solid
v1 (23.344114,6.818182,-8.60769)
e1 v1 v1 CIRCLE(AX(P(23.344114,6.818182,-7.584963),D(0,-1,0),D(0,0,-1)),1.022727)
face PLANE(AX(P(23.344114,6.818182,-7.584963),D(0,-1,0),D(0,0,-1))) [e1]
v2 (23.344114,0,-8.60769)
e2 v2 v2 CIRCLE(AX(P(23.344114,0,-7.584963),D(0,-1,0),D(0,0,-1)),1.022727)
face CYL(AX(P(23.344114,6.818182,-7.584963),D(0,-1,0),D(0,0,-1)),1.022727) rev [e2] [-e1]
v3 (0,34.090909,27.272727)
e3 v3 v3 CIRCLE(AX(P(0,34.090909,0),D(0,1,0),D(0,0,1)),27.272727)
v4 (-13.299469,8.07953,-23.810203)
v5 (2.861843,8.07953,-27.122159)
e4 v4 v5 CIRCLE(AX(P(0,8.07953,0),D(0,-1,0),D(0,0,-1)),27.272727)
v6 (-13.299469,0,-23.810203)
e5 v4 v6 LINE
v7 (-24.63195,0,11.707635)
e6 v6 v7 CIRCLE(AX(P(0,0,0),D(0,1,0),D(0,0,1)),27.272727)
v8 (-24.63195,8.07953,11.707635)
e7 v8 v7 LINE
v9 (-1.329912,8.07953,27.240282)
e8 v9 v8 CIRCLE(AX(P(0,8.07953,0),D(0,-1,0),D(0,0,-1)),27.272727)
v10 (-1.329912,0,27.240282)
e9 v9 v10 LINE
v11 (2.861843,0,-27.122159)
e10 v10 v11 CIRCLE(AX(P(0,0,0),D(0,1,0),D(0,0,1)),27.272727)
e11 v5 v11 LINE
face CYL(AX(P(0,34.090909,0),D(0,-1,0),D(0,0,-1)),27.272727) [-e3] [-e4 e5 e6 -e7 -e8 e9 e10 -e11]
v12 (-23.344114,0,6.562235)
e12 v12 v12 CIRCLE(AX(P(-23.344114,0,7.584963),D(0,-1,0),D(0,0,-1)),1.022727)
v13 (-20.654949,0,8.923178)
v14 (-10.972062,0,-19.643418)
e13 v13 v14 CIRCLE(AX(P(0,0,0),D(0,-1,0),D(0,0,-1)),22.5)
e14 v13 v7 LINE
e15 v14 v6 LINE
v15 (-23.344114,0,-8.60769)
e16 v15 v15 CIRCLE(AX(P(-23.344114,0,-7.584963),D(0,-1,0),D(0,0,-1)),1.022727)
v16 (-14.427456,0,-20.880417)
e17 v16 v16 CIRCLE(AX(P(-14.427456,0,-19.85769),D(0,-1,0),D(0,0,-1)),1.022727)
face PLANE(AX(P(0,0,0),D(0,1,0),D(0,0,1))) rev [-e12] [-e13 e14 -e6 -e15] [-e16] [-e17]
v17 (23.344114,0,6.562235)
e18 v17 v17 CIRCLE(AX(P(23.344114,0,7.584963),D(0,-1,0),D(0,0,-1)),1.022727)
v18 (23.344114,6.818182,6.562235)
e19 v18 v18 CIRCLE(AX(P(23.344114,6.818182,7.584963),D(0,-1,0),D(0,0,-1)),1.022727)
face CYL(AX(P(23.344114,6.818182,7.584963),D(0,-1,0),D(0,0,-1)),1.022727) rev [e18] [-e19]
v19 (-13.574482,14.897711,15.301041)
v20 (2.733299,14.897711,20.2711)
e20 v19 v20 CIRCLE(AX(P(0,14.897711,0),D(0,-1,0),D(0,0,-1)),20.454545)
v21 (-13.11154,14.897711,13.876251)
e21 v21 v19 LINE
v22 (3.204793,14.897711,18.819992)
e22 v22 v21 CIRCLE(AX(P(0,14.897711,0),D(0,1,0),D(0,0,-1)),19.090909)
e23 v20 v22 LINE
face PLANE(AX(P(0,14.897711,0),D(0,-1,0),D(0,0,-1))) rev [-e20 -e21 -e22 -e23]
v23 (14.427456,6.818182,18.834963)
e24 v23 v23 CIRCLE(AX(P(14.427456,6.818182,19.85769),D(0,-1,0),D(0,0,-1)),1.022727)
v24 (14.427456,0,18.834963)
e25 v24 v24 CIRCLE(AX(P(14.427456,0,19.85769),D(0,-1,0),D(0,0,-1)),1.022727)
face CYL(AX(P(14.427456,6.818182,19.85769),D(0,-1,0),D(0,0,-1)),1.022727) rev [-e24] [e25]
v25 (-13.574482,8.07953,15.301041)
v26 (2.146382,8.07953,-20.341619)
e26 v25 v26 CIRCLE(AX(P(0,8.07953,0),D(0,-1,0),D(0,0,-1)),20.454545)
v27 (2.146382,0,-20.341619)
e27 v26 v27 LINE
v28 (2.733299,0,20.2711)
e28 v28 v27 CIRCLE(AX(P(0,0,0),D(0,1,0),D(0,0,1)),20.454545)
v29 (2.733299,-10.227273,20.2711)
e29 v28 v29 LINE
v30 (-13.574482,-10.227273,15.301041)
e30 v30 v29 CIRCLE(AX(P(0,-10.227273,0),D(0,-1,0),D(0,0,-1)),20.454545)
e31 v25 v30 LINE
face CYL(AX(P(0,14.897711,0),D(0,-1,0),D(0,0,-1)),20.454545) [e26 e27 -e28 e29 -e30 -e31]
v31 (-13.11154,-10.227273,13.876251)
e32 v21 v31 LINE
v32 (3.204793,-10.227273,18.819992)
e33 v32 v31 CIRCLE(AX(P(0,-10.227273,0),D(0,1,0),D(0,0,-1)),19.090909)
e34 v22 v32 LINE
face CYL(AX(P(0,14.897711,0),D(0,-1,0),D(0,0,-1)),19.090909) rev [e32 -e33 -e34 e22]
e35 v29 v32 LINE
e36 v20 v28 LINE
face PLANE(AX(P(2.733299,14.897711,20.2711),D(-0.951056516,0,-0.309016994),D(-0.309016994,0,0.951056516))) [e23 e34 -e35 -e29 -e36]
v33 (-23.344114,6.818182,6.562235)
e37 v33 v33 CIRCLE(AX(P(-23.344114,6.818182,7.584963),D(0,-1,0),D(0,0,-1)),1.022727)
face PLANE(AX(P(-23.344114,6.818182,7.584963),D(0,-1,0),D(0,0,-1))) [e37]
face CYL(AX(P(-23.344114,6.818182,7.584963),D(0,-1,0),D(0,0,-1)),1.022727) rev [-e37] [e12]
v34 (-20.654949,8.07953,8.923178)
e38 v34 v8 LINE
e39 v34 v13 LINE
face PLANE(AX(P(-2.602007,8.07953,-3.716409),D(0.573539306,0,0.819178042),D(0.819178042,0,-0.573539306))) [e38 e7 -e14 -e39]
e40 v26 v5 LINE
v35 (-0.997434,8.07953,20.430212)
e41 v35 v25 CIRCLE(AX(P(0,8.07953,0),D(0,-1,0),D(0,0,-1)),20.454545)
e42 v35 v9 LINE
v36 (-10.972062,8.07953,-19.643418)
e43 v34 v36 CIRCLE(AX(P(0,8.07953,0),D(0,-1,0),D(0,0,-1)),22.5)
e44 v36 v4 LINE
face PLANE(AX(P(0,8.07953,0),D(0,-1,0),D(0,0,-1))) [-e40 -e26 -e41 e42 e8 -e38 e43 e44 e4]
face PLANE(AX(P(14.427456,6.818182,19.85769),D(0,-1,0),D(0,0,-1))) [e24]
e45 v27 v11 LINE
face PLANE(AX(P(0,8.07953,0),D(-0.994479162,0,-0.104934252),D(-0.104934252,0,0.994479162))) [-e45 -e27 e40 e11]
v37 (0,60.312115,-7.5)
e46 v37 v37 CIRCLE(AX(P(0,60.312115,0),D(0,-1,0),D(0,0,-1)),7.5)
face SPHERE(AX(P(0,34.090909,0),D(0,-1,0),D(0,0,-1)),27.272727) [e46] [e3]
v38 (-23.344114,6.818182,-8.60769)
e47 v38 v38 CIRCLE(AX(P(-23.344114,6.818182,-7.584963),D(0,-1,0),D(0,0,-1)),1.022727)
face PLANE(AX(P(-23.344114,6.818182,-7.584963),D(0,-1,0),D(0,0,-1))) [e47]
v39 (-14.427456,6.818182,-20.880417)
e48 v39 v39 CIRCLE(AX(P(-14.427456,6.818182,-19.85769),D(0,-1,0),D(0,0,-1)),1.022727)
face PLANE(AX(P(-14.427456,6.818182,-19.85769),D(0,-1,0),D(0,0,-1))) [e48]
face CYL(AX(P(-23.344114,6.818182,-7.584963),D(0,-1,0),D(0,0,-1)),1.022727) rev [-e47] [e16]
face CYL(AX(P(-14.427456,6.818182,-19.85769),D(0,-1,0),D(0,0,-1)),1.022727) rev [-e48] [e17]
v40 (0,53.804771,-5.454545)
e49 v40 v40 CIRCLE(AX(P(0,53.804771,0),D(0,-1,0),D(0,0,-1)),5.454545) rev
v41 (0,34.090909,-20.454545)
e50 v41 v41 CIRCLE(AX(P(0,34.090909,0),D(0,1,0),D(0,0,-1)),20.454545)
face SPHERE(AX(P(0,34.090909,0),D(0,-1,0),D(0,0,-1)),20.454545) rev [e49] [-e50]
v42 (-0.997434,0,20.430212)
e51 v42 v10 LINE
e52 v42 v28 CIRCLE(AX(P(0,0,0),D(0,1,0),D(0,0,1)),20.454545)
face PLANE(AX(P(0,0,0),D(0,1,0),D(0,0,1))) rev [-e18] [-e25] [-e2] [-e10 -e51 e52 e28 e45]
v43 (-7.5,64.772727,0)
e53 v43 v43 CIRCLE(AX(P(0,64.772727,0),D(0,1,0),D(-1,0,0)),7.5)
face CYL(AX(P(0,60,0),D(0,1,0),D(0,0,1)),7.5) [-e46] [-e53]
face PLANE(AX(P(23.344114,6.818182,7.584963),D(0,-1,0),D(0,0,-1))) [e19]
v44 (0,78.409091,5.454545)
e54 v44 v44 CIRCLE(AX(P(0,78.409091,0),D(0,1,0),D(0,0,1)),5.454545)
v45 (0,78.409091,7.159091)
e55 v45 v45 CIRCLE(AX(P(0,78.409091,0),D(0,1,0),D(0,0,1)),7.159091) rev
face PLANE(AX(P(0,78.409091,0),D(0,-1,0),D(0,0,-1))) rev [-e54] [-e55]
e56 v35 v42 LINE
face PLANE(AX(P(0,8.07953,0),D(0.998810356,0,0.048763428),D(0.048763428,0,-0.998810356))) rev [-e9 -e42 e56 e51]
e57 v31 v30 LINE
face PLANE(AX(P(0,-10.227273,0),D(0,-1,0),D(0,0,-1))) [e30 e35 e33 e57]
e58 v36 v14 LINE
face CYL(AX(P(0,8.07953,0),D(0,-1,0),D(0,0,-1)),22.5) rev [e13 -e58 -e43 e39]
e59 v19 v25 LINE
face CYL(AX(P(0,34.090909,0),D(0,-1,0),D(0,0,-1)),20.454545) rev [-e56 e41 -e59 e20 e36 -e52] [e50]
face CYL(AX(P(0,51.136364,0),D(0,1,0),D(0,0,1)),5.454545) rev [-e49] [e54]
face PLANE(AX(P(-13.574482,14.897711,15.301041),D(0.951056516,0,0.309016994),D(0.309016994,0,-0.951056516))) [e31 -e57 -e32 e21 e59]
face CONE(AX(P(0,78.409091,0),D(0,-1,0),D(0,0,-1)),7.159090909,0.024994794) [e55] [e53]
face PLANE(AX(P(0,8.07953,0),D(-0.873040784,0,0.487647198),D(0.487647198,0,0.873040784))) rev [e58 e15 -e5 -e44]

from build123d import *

# Parameters (mm, degrees)
ESBO_O1_R                     = 40
ESBO_O1_R_2                   = 30
RESSALTO_EXTRUS_O1_DEPTH      = 50
ESBO_O2_R                     = 1.5
CORTE_EXTRUS_O1_DEPTH         = 10
CORTE_EXTRUS_O2_DEPTH         = 11.84997677
RESSALTO_EXTRUS_O2_DEPTH      = 26.84997677
RESSALTO_EXTRUS_O2_DEPTH_BACK = 10
REVOLU_O1_ANGLE               = 180
RESSALTO_EXTRUS_O5_DEPTH      = 5
RESSALTO_EXTRUS_O5_DEPTH_BACK = 2
ESBO_O10_R                    = 11
ESBO_O13_R                    = 8
CORTE_EXTRUS_O4_DEPTH         = 40
ESCALA1_SCALE                 = 0.681818182


# Read off the part's stored shape, not the designer's step: Limites1
with BuildPart() as part:
    # Esboço1 → Ressalto-extrusão1 (new body)
    with BuildSketch(Plane(origin=(0, 0, 0), x_dir=(1, 0, 0), z_dir=(0, 1, 0))):
        with Locations(Location((0, 0, 0), (0, 0, 270))):
            Circle(ESBO_O1_R)
        with Locations(Location((0, 0, 0), (0, 0, 270))):
            Circle(ESBO_O1_R_2, mode=Mode.SUBTRACT)
    extrude(amount=RESSALTO_EXTRUS_O1_DEPTH)

    # Esboço2 → Corte-extrusão1 (cut)
    with BuildSketch(Plane(origin=(0, 0, 0), x_dir=(-1, 0, 0), z_dir=(0, -1, 0))):
        with Locations(Location((-21.160269083, -29.124611797, 0), (0, 0, 90))):
            Circle(ESBO_O2_R)
        with Locations(Location((-34.238034587, -11.124611797, 0), (0, 0, 90))):
            Circle(ESBO_O2_R)
        with Locations(Location((-34.238034587, 11.124611797, 0), (0, 0, 90))):
            Circle(ESBO_O2_R)
        with Locations(Location((21.160269083, 29.124611797, 0), (0, 0, 90))):
            Circle(ESBO_O2_R)
        with Locations(Location((34.238034587, 11.124611797, 0), (0, 0, 90))):
            Circle(ESBO_O2_R)
        with Locations(Location((34.238034587, -11.124611797, 0), (0, 0, 90))):
            Circle(ESBO_O2_R)
    extrude(amount=-CORTE_EXTRUS_O1_DEPTH, mode=Mode.SUBTRACT)

    # Esboço3 → Corte-extrusão2 (cut)
    with BuildSketch(Plane(origin=(0, 0, 0), x_dir=(-1, 0, 0), z_dir=(0, -1, 0))):
        with BuildLine():
            ThreePointArc((30.293924668, -13.087327008), (31.253408489, 10.593604572), (16.092357529, 28.81034587))
            Line((16.092357529, 28.81034587), (19.505887914, 34.921631358))
            ThreePointArc((19.505887914, 34.921631358), (8.030354378, 39.185627576), (-4.197370073, 39.779166463))
            Line((-4.197370073, 39.779166463), (-3.148027555, 29.834374847))
            ThreePointArc((-3.148027555, 29.834374847), (29.911212101, 2.306380417), (1.462902849, -29.964310692))
            Line((1.462902849, -29.964310692), (1.950537132, -39.952414256))
            ThreePointArc((1.950537132, -39.952414256), (22.185986252, -33.283359416), (36.126859334, -17.171197823))
            Line((36.126859334, -17.171197823), (30.293924668, -13.087327008))
        make_face()
    extrude(amount=-CORTE_EXTRUS_O2_DEPTH, mode=Mode.SUBTRACT)

    # Esboço4 → Ressalto-extrusão2 (add, two sides: drawn at the far end of the back side and taken through both)
    with BuildSketch(Plane(origin=(0, 11.84997677, 0), x_dir=(-1, 0, 0), z_dir=(0, -1, 0)).offset(-RESSALTO_EXTRUS_O2_DEPTH_BACK)):
        with BuildLine():
            Line((-4.008838629, -29.730947056), (-4.700362463, -27.602655537))
            ThreePointArc((-4.700362463, -27.602655537), (-8.119302432, 26.79695744), (19.230258499, -20.351834268))
            Line((19.230258499, -20.351834268), (19.909240802, -22.441526924))
            ThreePointArc((19.909240802, -22.441526924), (-8.745833796, 28.696870757), (-4.008838629, -29.730947056))
        make_face()
    extrude(amount=RESSALTO_EXTRUS_O2_DEPTH + RESSALTO_EXTRUS_O2_DEPTH_BACK)

    # Esboço9 → Revolução1 (revolve)
    with BuildSketch(Plane(origin=(0, 50, 0), x_dir=(1, 0, 0), z_dir=(0, 1, 0))):
        with BuildLine():
            Line((-40, 0), (-30, 0))
            ThreePointArc((-30, 0), (0, 30), (30, 0))
            Line((30, 0), (40, 0))
            ThreePointArc((40, 0), (0, 40), (-40, 0))
        make_face()
    revolve(axis=Axis((-40, 50, 0), (1, 0, 0)), revolution_arc=REVOLU_O1_ANGLE)

    # Esboço10 → Ressalto-extrusão5 (add, two sides: drawn at the far end of the back side and taken through both)
    with BuildSketch(Plane(origin=(0, 90, 0), x_dir=(1, 0, 0), z_dir=(0, 1, 0)).offset(-RESSALTO_EXTRUS_O5_DEPTH_BACK)):
        with Locations(Location((0, 0, 0), (0, 0, 270))):
            Circle(ESBO_O10_R)
    extrude(amount=RESSALTO_EXTRUS_O5_DEPTH + RESSALTO_EXTRUS_O5_DEPTH_BACK)

    # Limites1 outline → Limites1 (revolve)
    with BuildSketch(Plane.XY):
        Polygon((11, 95), (10.5, 115), (0, 115), (0, 95), align=None)
    revolve(axis=Axis((0, 0, 0), (0, 1, 0)))

    # Esboço13 → Corte-extrusão4 (cut)
    with BuildSketch(Plane(origin=(0, 115, 0), x_dir=(1, 0, 0), z_dir=(0, 1, 0))):
        with Locations(Location((0, 0, 0), (0, 0, 270))):
            Circle(ESBO_O13_R)
    extrude(amount=-CORTE_EXTRUS_O4_DEPTH, mode=Mode.SUBTRACT)


with BuildPart() as part_1:
    # Escala1: scaled about (0, 0, 0)
    add(part.part.scale(ESCALA1_SCALE))


solid = part_1.part
